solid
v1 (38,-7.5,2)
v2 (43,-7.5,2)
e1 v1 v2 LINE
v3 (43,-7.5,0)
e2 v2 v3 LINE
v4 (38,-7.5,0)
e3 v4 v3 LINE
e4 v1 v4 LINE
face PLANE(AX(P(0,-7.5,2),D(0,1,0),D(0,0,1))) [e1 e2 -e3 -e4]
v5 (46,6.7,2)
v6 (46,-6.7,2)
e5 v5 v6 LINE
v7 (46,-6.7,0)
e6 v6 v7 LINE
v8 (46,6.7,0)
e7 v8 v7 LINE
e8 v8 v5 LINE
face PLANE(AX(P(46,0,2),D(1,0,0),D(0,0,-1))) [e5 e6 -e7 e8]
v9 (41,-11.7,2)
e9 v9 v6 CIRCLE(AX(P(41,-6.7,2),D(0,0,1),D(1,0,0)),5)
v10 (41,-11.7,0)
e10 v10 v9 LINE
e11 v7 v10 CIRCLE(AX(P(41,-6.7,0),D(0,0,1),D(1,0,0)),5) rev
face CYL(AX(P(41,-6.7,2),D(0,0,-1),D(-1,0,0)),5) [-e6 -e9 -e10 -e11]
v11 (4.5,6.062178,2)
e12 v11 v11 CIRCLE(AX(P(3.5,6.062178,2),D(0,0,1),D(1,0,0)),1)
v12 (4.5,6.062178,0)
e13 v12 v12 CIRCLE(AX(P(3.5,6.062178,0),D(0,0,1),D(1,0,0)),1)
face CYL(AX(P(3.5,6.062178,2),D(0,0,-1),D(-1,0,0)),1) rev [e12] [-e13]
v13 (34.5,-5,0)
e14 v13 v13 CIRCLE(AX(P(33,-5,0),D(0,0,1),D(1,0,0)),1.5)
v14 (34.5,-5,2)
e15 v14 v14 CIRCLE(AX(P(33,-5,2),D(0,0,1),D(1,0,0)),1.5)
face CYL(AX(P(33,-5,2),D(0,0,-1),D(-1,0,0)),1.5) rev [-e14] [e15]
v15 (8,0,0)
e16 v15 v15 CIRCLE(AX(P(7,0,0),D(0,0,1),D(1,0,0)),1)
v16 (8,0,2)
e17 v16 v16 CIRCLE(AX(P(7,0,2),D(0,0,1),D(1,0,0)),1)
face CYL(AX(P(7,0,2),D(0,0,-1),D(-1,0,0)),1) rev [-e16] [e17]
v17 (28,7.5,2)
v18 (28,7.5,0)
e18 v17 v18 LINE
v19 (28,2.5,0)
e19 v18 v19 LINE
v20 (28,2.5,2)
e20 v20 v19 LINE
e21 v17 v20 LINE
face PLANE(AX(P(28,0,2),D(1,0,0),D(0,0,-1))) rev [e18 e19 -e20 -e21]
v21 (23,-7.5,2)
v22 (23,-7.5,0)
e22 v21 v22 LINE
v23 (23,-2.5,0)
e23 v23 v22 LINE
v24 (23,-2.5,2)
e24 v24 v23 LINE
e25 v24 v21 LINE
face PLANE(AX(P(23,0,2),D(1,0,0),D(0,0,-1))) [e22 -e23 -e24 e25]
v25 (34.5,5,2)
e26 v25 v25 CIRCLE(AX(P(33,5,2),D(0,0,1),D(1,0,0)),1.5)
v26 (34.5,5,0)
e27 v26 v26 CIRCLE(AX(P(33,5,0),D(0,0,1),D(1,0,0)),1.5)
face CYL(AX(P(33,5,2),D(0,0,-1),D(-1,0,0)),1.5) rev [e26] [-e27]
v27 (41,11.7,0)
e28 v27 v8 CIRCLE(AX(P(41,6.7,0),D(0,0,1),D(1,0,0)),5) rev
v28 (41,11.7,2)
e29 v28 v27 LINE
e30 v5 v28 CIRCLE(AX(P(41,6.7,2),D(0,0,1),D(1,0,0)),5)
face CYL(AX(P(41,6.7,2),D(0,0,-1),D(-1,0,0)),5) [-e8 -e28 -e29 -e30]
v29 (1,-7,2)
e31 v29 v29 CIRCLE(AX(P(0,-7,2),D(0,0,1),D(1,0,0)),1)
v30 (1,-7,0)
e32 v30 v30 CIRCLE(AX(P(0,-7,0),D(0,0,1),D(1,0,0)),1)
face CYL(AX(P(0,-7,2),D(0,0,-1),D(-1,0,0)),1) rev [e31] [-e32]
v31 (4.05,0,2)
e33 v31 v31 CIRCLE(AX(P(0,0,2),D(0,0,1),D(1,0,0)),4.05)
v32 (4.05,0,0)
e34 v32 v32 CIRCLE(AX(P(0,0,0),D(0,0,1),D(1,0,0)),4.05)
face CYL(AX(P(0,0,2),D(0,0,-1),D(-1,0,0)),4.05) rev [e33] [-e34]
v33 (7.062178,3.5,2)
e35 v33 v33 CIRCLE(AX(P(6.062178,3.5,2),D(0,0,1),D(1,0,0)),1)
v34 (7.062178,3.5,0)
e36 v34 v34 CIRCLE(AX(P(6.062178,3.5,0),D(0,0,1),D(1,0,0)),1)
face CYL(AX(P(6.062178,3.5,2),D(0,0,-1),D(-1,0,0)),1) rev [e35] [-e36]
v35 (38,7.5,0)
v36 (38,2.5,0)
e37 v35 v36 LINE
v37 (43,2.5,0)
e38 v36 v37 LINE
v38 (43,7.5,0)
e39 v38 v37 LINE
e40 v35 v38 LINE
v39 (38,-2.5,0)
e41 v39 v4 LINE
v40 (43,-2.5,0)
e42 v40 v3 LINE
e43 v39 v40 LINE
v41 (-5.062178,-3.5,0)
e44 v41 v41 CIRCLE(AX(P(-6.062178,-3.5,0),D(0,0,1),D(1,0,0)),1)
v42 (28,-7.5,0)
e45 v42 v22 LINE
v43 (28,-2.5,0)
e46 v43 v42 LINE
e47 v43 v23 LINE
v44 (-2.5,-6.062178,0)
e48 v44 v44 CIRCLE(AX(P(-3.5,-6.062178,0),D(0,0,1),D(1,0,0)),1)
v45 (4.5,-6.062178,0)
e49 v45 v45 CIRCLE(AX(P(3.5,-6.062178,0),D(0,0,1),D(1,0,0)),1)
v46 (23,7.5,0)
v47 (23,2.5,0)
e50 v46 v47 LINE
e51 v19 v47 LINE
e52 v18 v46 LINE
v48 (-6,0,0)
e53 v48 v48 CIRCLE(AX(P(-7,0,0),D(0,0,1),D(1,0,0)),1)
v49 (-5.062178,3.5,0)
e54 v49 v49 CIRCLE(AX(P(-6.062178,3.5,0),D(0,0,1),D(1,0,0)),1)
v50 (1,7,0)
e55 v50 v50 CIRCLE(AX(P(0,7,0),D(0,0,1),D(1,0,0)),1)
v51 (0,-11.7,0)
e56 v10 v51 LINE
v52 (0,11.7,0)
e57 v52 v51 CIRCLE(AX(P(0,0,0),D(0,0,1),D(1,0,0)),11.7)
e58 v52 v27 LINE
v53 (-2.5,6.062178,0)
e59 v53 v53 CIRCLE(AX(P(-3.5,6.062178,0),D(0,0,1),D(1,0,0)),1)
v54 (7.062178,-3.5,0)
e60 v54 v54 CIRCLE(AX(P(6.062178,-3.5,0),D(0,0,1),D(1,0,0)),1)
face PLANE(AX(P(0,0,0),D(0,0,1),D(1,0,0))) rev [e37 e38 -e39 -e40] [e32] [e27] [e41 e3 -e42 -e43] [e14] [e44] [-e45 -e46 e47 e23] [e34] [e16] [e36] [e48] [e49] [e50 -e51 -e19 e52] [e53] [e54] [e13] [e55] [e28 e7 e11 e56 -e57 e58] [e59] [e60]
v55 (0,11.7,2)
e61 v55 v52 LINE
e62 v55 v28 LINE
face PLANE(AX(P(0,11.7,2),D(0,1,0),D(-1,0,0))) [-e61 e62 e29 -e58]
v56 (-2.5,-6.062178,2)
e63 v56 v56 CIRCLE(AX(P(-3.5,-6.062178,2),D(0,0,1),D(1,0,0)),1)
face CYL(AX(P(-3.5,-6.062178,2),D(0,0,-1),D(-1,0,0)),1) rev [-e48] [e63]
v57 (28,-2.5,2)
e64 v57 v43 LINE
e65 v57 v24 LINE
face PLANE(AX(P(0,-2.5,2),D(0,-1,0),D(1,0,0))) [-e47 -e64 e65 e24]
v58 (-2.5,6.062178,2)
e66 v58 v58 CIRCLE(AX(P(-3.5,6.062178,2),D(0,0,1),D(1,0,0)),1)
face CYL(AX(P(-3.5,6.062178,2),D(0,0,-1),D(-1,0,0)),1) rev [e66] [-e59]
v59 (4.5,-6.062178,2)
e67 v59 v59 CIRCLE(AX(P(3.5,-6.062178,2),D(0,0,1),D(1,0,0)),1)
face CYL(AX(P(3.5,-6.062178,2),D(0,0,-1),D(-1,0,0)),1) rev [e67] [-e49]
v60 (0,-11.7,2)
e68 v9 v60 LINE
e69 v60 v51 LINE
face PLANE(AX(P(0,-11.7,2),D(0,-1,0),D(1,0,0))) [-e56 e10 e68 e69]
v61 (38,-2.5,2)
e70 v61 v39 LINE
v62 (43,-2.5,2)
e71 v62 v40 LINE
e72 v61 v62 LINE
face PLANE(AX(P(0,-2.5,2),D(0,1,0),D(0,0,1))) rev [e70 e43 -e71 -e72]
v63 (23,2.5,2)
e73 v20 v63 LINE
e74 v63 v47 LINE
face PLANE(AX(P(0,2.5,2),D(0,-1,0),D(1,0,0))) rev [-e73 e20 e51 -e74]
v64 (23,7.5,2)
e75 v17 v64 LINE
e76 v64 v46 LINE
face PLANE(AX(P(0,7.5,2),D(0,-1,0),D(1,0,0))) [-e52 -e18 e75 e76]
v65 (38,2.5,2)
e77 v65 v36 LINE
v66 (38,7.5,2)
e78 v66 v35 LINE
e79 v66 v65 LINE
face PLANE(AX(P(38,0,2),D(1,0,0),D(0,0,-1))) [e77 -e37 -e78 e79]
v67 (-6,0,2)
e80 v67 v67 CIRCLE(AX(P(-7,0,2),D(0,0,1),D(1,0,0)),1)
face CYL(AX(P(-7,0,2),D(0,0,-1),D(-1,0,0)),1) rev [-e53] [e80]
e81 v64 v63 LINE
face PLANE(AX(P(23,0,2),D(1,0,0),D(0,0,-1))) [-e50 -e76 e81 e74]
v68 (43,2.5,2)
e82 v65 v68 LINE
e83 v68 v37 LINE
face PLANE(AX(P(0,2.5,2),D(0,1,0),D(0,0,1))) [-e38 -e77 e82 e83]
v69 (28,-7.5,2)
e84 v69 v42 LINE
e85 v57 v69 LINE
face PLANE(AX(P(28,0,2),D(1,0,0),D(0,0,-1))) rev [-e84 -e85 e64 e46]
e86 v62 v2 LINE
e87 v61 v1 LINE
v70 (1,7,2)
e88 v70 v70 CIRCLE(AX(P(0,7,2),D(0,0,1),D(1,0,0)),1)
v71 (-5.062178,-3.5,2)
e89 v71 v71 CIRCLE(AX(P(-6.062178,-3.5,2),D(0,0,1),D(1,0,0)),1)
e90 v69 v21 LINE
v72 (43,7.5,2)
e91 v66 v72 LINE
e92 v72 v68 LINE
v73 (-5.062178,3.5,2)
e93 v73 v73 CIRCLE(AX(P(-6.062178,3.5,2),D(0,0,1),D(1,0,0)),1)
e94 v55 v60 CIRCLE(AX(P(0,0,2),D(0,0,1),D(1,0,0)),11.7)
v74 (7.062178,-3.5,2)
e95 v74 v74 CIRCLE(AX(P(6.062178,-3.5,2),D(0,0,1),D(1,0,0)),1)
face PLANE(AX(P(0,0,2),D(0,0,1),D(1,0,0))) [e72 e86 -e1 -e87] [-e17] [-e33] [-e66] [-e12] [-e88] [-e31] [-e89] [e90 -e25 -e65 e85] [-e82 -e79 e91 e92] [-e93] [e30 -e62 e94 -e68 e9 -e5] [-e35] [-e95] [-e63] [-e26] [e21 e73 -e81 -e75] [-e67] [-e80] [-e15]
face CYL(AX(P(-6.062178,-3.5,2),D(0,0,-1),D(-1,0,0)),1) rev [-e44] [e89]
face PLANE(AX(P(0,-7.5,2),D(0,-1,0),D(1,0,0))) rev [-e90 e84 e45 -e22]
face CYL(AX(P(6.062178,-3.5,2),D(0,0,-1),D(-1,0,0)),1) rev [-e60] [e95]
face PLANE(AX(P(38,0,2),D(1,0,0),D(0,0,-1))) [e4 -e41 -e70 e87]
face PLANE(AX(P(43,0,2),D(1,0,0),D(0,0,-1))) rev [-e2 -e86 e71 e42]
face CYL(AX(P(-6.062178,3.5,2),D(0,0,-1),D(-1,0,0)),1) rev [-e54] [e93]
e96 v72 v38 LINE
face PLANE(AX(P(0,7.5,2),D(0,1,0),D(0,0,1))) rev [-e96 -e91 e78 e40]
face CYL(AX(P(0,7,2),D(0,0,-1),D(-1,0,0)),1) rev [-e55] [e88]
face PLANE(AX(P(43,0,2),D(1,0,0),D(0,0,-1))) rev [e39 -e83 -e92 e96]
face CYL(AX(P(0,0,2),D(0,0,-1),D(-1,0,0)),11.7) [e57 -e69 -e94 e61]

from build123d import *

# Parameters (mm, degrees)
BOSS_EXTRUDE1_OUTLINE_R   = 1
BOSS_EXTRUDE1_OUTLINE_W   = 5
BOSS_EXTRUDE1_OUTLINE_H   = 5
BOSS_EXTRUDE1_OUTLINE_R_2 = 1.5
BOSS_EXTRUDE1_OUTLINE_R_3 = 4.05
BOSS_EXTRUDE1_DEPTH       = 2
CONG_1_R                  = 5


# Read off the part's stored shape, not the designer's step: Boss-Extrude1
with BuildPart() as part:
    # Boss-Extrude1 outline → Boss-Extrude1 (new body)
    with BuildSketch(Plane.XY):
        with BuildLine():
            Line((46, -11.7), (46, 11.7))
            Line((46, 11.7), (0, 11.7))
            ThreePointArc((0, 11.7), (-11.7, 0), (0, -11.7))
            Line((0, -11.7), (46, -11.7))
        make_face()
        with Locations((-3.5, -6.062177826)):
            Circle(BOSS_EXTRUDE1_OUTLINE_R, mode=Mode.SUBTRACT)
        with Locations((0, -7)):
            Circle(BOSS_EXTRUDE1_OUTLINE_R, mode=Mode.SUBTRACT)
        with Locations((3.5, -6.062177826)):
            Circle(BOSS_EXTRUDE1_OUTLINE_R, mode=Mode.SUBTRACT)
        with Locations((-6.062177826, -3.5)):
            Circle(BOSS_EXTRUDE1_OUTLINE_R, mode=Mode.SUBTRACT)
        with Locations((6.062177826, -3.5)):
            Circle(BOSS_EXTRUDE1_OUTLINE_R, mode=Mode.SUBTRACT)
        with Locations((25.5, -5)):
            Rectangle(BOSS_EXTRUDE1_OUTLINE_W, BOSS_EXTRUDE1_OUTLINE_H, mode=Mode.SUBTRACT)
        with Locations((33, -5)):
            Circle(BOSS_EXTRUDE1_OUTLINE_R_2, mode=Mode.SUBTRACT)
        with Locations((40.5, -5)):
            Rectangle(BOSS_EXTRUDE1_OUTLINE_W, BOSS_EXTRUDE1_OUTLINE_H, mode=Mode.SUBTRACT)
        with Locations((-7, 0)):
            Circle(BOSS_EXTRUDE1_OUTLINE_R, mode=Mode.SUBTRACT)
        Circle(BOSS_EXTRUDE1_OUTLINE_R_3, mode=Mode.SUBTRACT)
        with Locations((-6.062177826, 3.5)):
            Circle(BOSS_EXTRUDE1_OUTLINE_R, mode=Mode.SUBTRACT)
        with Locations((7, 0)):
            Circle(BOSS_EXTRUDE1_OUTLINE_R, mode=Mode.SUBTRACT)
        with Locations((6.062177826, 3.5)):
            Circle(BOSS_EXTRUDE1_OUTLINE_R, mode=Mode.SUBTRACT)
        with Locations((-3.5, 6.062177826)):
            Circle(BOSS_EXTRUDE1_OUTLINE_R, mode=Mode.SUBTRACT)
        with Locations((0, 7)):
            Circle(BOSS_EXTRUDE1_OUTLINE_R, mode=Mode.SUBTRACT)
        with Locations((3.5, 6.062177826)):
            Circle(BOSS_EXTRUDE1_OUTLINE_R, mode=Mode.SUBTRACT)
        with Locations((25.5, 5)):
            Rectangle(BOSS_EXTRUDE1_OUTLINE_W, BOSS_EXTRUDE1_OUTLINE_H, mode=Mode.SUBTRACT)
        with Locations((33, 5)):
            Circle(BOSS_EXTRUDE1_OUTLINE_R_2, mode=Mode.SUBTRACT)
        with Locations((40.5, 5)):
            Rectangle(BOSS_EXTRUDE1_OUTLINE_W, BOSS_EXTRUDE1_OUTLINE_H, mode=Mode.SUBTRACT)
    extrude(amount=BOSS_EXTRUDE1_DEPTH)

    # Congé1
    cong_1_edges = [part.edges().sort_by_distance(p)[0] for p in [
        (46, 11.7, 1),
        (46, -11.7, 1),
    ]]
    fillet(cong_1_edges, radius=CONG_1_R)


solid = part.part
